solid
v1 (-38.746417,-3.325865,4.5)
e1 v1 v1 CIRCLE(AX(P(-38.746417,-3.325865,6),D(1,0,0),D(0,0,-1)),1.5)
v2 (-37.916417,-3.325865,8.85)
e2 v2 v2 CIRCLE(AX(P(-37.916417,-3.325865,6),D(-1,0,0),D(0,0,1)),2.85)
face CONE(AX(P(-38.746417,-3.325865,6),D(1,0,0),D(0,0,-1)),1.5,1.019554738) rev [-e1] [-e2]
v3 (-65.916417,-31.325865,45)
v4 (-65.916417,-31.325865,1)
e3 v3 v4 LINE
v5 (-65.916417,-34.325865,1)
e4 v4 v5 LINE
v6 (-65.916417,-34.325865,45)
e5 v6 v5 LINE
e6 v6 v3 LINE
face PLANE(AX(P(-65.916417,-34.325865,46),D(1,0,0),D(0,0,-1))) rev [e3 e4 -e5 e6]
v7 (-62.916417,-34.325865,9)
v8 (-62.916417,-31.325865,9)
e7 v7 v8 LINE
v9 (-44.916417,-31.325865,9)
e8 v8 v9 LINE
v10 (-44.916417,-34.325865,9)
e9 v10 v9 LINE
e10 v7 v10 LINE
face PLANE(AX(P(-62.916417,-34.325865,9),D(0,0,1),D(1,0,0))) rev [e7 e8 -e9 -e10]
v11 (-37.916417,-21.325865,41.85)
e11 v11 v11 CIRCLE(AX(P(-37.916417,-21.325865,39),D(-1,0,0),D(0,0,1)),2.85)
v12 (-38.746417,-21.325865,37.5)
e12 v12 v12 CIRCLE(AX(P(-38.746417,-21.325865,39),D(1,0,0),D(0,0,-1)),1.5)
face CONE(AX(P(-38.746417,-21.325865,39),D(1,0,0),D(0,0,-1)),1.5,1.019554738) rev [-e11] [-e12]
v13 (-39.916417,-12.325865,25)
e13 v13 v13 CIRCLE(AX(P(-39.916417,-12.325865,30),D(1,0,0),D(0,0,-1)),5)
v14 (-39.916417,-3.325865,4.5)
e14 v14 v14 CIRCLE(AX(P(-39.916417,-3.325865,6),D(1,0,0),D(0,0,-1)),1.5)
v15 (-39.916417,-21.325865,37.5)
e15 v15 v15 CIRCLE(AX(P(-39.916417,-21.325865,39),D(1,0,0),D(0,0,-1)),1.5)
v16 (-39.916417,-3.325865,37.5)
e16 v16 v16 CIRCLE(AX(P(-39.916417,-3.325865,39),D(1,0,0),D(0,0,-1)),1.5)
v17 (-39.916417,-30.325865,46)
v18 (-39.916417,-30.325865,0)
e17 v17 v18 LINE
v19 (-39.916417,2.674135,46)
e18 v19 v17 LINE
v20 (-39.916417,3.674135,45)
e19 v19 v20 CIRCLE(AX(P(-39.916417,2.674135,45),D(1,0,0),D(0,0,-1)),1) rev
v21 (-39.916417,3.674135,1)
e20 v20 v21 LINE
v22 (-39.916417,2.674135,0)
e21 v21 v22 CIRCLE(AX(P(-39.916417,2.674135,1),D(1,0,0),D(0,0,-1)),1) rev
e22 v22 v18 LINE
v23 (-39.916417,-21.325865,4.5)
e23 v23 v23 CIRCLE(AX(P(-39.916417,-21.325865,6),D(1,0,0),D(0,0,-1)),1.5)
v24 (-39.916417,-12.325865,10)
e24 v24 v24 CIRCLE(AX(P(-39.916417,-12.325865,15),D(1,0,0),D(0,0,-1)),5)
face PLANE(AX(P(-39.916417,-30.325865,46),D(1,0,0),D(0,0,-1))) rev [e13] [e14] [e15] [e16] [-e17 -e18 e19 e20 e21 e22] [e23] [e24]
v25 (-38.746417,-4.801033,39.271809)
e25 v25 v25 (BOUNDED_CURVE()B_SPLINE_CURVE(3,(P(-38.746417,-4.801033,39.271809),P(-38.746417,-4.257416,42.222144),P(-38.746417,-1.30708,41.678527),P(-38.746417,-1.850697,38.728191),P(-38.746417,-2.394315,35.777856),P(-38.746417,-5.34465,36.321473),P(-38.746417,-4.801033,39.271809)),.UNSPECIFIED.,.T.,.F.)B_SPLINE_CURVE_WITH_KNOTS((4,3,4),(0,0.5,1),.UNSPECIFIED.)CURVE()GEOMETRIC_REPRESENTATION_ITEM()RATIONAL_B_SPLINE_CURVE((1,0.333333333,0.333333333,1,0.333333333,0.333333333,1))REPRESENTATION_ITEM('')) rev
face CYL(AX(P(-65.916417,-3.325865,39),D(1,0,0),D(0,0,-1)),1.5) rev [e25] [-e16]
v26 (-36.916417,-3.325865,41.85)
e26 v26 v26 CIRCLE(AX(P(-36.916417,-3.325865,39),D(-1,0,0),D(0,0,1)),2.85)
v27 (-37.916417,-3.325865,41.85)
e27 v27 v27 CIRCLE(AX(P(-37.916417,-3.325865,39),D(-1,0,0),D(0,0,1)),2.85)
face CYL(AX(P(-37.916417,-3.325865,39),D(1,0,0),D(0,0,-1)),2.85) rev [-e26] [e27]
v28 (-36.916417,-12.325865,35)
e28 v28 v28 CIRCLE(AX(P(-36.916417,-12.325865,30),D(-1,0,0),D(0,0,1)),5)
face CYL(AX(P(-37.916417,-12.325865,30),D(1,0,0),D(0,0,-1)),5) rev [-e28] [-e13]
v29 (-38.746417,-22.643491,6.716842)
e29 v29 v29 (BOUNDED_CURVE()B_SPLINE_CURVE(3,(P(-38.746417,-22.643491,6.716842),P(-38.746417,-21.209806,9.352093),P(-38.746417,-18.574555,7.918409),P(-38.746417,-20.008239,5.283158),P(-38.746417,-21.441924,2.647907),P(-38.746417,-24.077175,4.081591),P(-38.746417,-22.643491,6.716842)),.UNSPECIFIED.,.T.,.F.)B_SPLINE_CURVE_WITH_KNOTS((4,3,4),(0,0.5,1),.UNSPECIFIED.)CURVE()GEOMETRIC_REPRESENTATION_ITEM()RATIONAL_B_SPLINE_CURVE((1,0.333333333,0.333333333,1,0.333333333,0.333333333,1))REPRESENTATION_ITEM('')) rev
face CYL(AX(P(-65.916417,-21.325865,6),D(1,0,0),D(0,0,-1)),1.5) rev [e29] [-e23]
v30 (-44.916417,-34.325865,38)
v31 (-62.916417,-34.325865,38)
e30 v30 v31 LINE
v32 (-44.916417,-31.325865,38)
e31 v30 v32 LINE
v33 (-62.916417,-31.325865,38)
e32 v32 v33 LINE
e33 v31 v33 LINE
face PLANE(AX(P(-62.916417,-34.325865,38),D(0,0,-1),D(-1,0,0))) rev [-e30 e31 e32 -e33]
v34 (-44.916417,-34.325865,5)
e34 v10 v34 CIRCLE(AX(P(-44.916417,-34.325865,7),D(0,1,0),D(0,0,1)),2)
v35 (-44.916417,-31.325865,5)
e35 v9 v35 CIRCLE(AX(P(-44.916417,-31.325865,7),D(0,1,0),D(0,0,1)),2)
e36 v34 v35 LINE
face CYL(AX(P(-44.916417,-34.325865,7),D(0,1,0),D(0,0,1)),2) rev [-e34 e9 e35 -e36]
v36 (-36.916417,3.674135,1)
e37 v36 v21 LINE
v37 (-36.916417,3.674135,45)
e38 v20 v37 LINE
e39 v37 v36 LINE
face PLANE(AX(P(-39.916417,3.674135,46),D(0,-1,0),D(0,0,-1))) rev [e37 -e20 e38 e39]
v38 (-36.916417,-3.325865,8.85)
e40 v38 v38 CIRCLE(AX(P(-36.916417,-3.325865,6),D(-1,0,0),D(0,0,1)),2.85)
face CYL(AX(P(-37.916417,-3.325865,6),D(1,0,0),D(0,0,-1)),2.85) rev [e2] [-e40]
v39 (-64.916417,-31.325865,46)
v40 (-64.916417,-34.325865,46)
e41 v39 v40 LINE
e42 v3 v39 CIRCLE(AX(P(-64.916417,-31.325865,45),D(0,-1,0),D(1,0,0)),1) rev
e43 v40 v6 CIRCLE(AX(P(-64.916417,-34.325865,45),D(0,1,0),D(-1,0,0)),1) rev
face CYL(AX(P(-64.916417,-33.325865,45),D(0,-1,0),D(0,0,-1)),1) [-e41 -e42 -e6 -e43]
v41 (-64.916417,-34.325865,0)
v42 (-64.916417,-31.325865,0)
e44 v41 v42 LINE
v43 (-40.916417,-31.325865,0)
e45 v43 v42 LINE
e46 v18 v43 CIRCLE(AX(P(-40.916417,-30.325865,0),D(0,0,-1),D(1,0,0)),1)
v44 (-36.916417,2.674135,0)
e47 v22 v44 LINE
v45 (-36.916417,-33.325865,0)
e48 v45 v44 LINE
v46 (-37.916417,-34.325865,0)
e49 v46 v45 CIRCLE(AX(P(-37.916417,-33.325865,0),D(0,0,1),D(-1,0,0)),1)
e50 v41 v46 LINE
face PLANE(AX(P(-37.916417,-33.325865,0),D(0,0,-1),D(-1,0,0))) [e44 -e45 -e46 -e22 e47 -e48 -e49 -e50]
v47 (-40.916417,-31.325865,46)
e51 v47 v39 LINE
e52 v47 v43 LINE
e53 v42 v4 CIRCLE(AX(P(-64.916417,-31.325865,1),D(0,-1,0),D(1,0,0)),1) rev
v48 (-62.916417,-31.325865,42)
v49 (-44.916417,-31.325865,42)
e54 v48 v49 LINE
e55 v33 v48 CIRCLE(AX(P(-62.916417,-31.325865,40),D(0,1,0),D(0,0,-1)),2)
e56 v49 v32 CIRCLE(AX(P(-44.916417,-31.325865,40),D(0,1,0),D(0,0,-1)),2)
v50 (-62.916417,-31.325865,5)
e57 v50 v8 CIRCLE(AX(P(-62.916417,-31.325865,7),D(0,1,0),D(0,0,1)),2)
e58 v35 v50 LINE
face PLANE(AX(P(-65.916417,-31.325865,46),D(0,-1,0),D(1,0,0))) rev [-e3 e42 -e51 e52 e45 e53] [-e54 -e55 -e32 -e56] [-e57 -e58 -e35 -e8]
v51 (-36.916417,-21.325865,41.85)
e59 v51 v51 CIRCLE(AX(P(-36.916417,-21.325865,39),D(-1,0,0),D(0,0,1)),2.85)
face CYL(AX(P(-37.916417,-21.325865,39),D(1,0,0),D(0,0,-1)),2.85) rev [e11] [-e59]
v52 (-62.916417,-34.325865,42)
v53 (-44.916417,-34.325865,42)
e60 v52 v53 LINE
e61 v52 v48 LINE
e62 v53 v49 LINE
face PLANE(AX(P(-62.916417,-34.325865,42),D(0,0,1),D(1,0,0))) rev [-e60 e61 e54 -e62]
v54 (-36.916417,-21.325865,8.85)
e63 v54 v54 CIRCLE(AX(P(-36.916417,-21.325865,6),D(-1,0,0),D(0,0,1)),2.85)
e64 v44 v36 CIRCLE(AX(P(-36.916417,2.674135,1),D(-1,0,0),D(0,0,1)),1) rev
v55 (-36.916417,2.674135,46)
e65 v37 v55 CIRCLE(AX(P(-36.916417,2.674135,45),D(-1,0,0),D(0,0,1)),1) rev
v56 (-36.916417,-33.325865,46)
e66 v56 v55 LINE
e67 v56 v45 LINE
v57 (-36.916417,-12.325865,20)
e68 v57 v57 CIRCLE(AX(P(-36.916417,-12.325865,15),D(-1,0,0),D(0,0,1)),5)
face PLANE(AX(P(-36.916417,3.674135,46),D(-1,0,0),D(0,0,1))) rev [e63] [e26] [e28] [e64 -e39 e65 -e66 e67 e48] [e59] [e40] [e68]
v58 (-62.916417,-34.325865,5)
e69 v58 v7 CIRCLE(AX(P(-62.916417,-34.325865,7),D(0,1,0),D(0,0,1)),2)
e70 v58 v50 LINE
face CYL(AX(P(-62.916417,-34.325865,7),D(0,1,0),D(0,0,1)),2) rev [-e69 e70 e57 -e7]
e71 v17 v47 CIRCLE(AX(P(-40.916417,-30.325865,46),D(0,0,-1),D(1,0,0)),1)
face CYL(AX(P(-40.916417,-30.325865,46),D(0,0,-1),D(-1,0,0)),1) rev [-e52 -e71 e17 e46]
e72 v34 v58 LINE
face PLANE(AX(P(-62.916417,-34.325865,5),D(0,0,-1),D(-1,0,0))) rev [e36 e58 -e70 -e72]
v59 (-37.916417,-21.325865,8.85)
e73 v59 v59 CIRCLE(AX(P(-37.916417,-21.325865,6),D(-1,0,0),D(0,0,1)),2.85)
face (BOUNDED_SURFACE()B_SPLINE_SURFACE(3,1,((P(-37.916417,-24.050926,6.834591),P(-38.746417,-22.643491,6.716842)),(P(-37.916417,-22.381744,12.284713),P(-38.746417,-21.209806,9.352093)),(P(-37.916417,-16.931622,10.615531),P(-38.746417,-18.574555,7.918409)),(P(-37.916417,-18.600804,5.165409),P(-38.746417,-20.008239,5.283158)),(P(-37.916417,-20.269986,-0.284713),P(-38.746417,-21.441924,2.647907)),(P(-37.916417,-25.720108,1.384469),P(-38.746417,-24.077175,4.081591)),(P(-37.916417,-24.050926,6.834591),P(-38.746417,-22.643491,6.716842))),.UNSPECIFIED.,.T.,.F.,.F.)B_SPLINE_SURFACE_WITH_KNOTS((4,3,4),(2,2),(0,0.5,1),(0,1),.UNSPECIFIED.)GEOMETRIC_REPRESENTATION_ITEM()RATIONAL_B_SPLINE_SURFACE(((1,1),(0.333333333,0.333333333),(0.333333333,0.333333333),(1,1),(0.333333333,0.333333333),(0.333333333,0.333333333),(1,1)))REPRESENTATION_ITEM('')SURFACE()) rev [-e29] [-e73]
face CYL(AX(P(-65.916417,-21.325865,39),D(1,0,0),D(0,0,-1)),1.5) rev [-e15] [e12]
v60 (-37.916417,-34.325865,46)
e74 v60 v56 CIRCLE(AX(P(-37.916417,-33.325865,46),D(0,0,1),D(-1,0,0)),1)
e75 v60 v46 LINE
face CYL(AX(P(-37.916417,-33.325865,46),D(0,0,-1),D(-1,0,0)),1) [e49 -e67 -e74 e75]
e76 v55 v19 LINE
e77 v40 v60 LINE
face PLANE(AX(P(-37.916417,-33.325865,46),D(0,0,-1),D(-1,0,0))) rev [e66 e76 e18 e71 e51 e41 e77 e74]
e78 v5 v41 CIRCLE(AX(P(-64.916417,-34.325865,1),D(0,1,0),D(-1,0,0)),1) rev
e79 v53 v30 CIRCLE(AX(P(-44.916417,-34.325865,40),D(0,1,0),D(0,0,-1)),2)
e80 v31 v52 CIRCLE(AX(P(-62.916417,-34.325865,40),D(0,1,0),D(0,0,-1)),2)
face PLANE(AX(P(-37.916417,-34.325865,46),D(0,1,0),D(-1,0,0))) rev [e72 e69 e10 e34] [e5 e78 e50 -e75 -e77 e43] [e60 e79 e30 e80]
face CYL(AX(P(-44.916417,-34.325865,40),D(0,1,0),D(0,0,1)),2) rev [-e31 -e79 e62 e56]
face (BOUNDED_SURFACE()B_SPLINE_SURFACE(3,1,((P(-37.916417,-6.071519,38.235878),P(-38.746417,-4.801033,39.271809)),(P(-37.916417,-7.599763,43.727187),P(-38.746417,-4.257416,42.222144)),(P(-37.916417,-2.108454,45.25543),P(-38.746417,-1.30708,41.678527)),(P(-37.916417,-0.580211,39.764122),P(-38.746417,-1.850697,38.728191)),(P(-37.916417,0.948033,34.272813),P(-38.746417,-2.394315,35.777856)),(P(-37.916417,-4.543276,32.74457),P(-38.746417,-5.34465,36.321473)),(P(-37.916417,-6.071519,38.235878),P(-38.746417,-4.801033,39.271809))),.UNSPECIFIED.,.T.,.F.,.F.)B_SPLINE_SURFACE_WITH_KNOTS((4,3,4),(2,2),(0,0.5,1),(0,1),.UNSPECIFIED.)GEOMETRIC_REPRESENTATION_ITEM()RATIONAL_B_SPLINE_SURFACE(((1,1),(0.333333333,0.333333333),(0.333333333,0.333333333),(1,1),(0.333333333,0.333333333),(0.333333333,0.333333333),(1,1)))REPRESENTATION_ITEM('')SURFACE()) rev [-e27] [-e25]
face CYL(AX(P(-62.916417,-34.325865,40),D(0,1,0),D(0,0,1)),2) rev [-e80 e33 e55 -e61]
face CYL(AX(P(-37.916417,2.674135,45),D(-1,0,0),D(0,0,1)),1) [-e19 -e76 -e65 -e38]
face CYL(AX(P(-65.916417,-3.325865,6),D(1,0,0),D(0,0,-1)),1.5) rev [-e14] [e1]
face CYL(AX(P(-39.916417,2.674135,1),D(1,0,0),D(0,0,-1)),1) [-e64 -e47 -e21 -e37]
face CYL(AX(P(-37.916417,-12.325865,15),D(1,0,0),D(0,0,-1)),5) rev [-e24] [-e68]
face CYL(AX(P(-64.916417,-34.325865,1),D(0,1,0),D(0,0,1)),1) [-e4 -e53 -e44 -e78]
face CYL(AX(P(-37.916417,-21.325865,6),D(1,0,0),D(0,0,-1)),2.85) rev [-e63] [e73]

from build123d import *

# Parameters (mm, degrees)
SALIENTE_EXTRUIR1_DEPTH = 46
REDONDEO1_R             = 1
CROQUIS2_R              = 2.85
CROQUIS2_R_2            = 5
CORTAR_EXTRUIR1_DEPTH   = 1
CORTAR_EXTRUIR2_DEPTH   = 88.669687299
CROQUIS6_R              = 5
CORTAR_EXTRUIR3_DEPTH   = 65.306026243
CROQUIS7_3_R            = 1.5
CROQUIS7_5_R            = 1.5
CROQUIS7_6_R            = 1.5
CORTAR_EXTRUIR4_DEPTH   = 64.501763056


with BuildPart() as part:
    # Croquis1 → Saliente-Extruir1 (new body)
    with BuildSketch(Plane.XY):
        with BuildLine():
            Line((-36.916417311, 3.674134953), (-36.916417311, -33.325865047))
            ThreePointArc((-36.916417311, -33.325865047), (-37.20931053, -34.032971828), (-37.916417311, -34.325865047))
            Line((-37.916417311, -34.325865047), (-65.916417311, -34.325865047))
            Line((-65.916417311, -34.325865047), (-65.916417311, -31.325865047))
            Line((-65.916417311, -31.325865047), (-40.916417311, -31.325865047))
            ThreePointArc((-40.916417311, -31.325865047), (-40.20931053, -31.032971828), (-39.916417311, -30.325865047))
            Line((-39.916417311, -30.325865047), (-39.916417311, 3.674134953))
            Line((-39.916417311, 3.674134953), (-36.916417311, 3.674134953))
        make_face()
    extrude(amount=SALIENTE_EXTRUIR1_DEPTH)

    # Redondeo1
    redondeo1_edges = [part.edges().sort_by_distance(p)[0] for p in [
        (-38.416417311, 3.674134953, 0),
        (-65.916417311, -32.825865047, 46),
        (-38.416417311, 3.674134953, 46),
        (-65.916417311, -32.825865047, 0),
    ]]
    fillet(redondeo1_edges, radius=REDONDEO1_R)

    # Croquis2 → Cortar-Extruir1 (cut)
    with BuildSketch(Plane.ZY.offset(36.916417311)):
        with Locations((6, -3.325865047)):
            Circle(CROQUIS2_R)
        with Locations((39, -3.325865047)):
            Circle(CROQUIS2_R)
        with Locations((6, -21.325865047)):
            Circle(CROQUIS2_R)
        with Locations((39, -21.325865047)):
            Circle(CROQUIS2_R)
        with Locations((15, -12.325865047)):
            Circle(CROQUIS2_R_2)
        with Locations((30, -12.325865047)):
            Circle(CROQUIS2_R_2)
    extrude(amount=CORTAR_EXTRUIR1_DEPTH, mode=Mode.SUBTRACT)

    # Croquis3 → Cortar-Extruir2 (cut, through all)
    with BuildSketch(Plane(origin=(0, -31.325865047, 0), x_dir=(1, 0, 0), z_dir=(0, 1, 0))):
        with BuildLine():
            Line((-62.916417311, -42), (-44.916417311, -42))
            ThreePointArc((-44.916417311, -42), (-42.916417311, -40), (-44.916417311, -38))
            Line((-44.916417311, -38), (-62.916417311, -38))
            ThreePointArc((-62.916417311, -38), (-64.916417311, -40), (-62.916417311, -42))
        make_face()
        with BuildLine():
            Line((-62.916417311, -9), (-44.916417311, -9))
            ThreePointArc((-44.916417311, -9), (-42.916417311, -7), (-44.916417311, -5))
            Line((-44.916417311, -5), (-62.916417311, -5))
            ThreePointArc((-62.916417311, -5), (-64.916417311, -7), (-62.916417311, -9))
        make_face()
    extrude(amount=-CORTAR_EXTRUIR2_DEPTH, mode=Mode.SUBTRACT)

    # Croquis6 → Cortar-Extruir3 (cut, through all)
    with BuildSketch(Plane(origin=(-36.916417311, 0, 0), x_dir=(0, 0, -1), z_dir=(1, 0, 0))):
        with Locations((-30, -12.325865047)):
            Circle(CROQUIS6_R)
        with Locations((-15, -12.325865047)):
            Circle(CROQUIS6_R)
    extrude(amount=-CORTAR_EXTRUIR3_DEPTH, mode=Mode.SUBTRACT)

    # Cortar-Recubrir1: read off the stored shape, not the designer's step
    # Cortar-Recubrir1: loft between two sections, ruled curve by curve
    cortar_recubrir1_from = [
        Edge.make_bspline([(-37.916417311, -6.071519474, 38.235878437), (-37.916417311, -7.599762601, 43.727187292), (-37.916417311, -2.108453745, 45.255430419), (-37.916417311, -0.580210619, 39.764121563), (-37.916417311, 0.948032507, 34.272812708), (-37.916417311, -4.543276348, 32.744569581), (-37.916417311, -6.071519474, 38.235878437)], [0, 0, 0, 0, 0.5, 0.5, 0.5, 1, 1, 1, 1], 3, [1, 0.333333333, 0.333333333, 1, 0.333333333, 0.333333333, 1]),
    ]
    cortar_recubrir1_to = [
        Edge.make_bspline([(-38.746417311, -4.801032854, 39.271808645), (-38.746417311, -4.257415563, 42.22214426), (-38.746417311, -1.307079948, 41.67852697), (-38.746417311, -1.850697239, 38.728191355), (-38.746417311, -2.39431453, 35.77785574), (-38.746417311, -5.344650145, 36.32147303), (-38.746417311, -4.801032854, 39.271808645)], [0, 0, 0, 0, 0.5, 0.5, 0.5, 1, 1, 1, 1], 3, [1, 0.333333333, 0.333333333, 1, 0.333333333, 0.333333333, 1]),
    ]
    cortar_recubrir1 = Solid(Shell([*[Face.make_surface_from_curves(cortar_recubrir1_from[k], cortar_recubrir1_to[k]) for k in range(1)], Face(Wire(cortar_recubrir1_from)), Face(Wire(cortar_recubrir1_to))]))
    add(cortar_recubrir1, mode=Mode.SUBTRACT)

    # Croquis7<3> → section 1 of cortar_recubrir2
    with BuildSketch(Plane(origin=(-38.746417311, 0, 0), x_dir=(0, 0, -1), z_dir=(1, 0, 0)), mode=Mode.PRIVATE) as cortar_recubrir2_s1:
        with Locations((-39, -21.325865047)):
            Circle(CROQUIS7_3_R)
    # loft up to a face of the part (cortar_recubrir2)
    loft([Face(Wire([part.edges().sort_by_distance((-37.916417311, -23.403425635, 37.049040748))[0]])), cortar_recubrir2_s1.sketch], mode=Mode.SUBTRACT)

    # Cortar-Recubrir3: read off the stored shape, not the designer's step
    # Cortar-Recubrir3: loft between two sections, ruled curve by curve
    cortar_recubrir3_from = [
        Edge.make_bspline([(-37.916417311, -24.050926068, 6.834591174), (-37.916417311, -22.38174372, 12.284713218), (-37.916417311, -16.931621677, 10.615530869), (-37.916417311, -18.600804025, 5.165408826), (-37.916417311, -20.269986373, -0.284713218), (-37.916417311, -25.720108417, 1.384469131), (-37.916417311, -24.050926068, 6.834591174)], [0, 0, 0, 0, 0.5, 0.5, 0.5, 1, 1, 1, 1], 3, [1, 0.333333333, 0.333333333, 1, 0.333333333, 0.333333333, 1]),
    ]
    cortar_recubrir3_to = [
        Edge.make_bspline([(-38.746417311, -22.643490638, 6.716842243), (-38.746417311, -21.209806151, 9.352093425), (-38.746417311, -18.574554969, 7.918408939), (-38.746417311, -20.008239456, 5.283157757), (-38.746417311, -21.441923942, 2.647906575), (-38.746417311, -24.077175124, 4.081591061), (-38.746417311, -22.643490638, 6.716842243)], [0, 0, 0, 0, 0.5, 0.5, 0.5, 1, 1, 1, 1], 3, [1, 0.333333333, 0.333333333, 1, 0.333333333, 0.333333333, 1]),
    ]
    cortar_recubrir3 = Solid(Shell([*[Face.make_surface_from_curves(cortar_recubrir3_from[k], cortar_recubrir3_to[k]) for k in range(1)], Face(Wire(cortar_recubrir3_from)), Face(Wire(cortar_recubrir3_to))]))
    add(cortar_recubrir3, mode=Mode.SUBTRACT)

    # Croquis7<5> → section 1 of cortar_recubrir4
    with BuildSketch(Plane(origin=(-38.746417311, 0, 0), x_dir=(0, 0, -1), z_dir=(1, 0, 0)), mode=Mode.PRIVATE) as cortar_recubrir4_s1:
        with Locations((-6, -3.325865047)):
            Circle(CROQUIS7_5_R)
    # loft up to a face of the part (cortar_recubrir4)
    loft([Face(Wire([part.edges().sort_by_distance((-37.916417311, -5.403425635, 4.049040748))[0]])), cortar_recubrir4_s1.sketch], mode=Mode.SUBTRACT)

    # Croquis7<6> → Cortar-Extruir4 (cut, through all)
    with BuildSketch(Plane(origin=(-38.746417311, 0, 0), x_dir=(0, 0, -1), z_dir=(1, 0, 0))):
        with Locations((-39, -3.325865047)):
            Circle(CROQUIS7_6_R)
        with Locations((-39, -21.325865047)):
            Circle(CROQUIS7_6_R)
        with Locations((-6, -21.325865047)):
            Circle(CROQUIS7_6_R)
        with Locations((-6, -3.325865047)):
            Circle(CROQUIS7_6_R)
    extrude(amount=-CORTAR_EXTRUIR4_DEPTH, mode=Mode.SUBTRACT)


solid = part.part
